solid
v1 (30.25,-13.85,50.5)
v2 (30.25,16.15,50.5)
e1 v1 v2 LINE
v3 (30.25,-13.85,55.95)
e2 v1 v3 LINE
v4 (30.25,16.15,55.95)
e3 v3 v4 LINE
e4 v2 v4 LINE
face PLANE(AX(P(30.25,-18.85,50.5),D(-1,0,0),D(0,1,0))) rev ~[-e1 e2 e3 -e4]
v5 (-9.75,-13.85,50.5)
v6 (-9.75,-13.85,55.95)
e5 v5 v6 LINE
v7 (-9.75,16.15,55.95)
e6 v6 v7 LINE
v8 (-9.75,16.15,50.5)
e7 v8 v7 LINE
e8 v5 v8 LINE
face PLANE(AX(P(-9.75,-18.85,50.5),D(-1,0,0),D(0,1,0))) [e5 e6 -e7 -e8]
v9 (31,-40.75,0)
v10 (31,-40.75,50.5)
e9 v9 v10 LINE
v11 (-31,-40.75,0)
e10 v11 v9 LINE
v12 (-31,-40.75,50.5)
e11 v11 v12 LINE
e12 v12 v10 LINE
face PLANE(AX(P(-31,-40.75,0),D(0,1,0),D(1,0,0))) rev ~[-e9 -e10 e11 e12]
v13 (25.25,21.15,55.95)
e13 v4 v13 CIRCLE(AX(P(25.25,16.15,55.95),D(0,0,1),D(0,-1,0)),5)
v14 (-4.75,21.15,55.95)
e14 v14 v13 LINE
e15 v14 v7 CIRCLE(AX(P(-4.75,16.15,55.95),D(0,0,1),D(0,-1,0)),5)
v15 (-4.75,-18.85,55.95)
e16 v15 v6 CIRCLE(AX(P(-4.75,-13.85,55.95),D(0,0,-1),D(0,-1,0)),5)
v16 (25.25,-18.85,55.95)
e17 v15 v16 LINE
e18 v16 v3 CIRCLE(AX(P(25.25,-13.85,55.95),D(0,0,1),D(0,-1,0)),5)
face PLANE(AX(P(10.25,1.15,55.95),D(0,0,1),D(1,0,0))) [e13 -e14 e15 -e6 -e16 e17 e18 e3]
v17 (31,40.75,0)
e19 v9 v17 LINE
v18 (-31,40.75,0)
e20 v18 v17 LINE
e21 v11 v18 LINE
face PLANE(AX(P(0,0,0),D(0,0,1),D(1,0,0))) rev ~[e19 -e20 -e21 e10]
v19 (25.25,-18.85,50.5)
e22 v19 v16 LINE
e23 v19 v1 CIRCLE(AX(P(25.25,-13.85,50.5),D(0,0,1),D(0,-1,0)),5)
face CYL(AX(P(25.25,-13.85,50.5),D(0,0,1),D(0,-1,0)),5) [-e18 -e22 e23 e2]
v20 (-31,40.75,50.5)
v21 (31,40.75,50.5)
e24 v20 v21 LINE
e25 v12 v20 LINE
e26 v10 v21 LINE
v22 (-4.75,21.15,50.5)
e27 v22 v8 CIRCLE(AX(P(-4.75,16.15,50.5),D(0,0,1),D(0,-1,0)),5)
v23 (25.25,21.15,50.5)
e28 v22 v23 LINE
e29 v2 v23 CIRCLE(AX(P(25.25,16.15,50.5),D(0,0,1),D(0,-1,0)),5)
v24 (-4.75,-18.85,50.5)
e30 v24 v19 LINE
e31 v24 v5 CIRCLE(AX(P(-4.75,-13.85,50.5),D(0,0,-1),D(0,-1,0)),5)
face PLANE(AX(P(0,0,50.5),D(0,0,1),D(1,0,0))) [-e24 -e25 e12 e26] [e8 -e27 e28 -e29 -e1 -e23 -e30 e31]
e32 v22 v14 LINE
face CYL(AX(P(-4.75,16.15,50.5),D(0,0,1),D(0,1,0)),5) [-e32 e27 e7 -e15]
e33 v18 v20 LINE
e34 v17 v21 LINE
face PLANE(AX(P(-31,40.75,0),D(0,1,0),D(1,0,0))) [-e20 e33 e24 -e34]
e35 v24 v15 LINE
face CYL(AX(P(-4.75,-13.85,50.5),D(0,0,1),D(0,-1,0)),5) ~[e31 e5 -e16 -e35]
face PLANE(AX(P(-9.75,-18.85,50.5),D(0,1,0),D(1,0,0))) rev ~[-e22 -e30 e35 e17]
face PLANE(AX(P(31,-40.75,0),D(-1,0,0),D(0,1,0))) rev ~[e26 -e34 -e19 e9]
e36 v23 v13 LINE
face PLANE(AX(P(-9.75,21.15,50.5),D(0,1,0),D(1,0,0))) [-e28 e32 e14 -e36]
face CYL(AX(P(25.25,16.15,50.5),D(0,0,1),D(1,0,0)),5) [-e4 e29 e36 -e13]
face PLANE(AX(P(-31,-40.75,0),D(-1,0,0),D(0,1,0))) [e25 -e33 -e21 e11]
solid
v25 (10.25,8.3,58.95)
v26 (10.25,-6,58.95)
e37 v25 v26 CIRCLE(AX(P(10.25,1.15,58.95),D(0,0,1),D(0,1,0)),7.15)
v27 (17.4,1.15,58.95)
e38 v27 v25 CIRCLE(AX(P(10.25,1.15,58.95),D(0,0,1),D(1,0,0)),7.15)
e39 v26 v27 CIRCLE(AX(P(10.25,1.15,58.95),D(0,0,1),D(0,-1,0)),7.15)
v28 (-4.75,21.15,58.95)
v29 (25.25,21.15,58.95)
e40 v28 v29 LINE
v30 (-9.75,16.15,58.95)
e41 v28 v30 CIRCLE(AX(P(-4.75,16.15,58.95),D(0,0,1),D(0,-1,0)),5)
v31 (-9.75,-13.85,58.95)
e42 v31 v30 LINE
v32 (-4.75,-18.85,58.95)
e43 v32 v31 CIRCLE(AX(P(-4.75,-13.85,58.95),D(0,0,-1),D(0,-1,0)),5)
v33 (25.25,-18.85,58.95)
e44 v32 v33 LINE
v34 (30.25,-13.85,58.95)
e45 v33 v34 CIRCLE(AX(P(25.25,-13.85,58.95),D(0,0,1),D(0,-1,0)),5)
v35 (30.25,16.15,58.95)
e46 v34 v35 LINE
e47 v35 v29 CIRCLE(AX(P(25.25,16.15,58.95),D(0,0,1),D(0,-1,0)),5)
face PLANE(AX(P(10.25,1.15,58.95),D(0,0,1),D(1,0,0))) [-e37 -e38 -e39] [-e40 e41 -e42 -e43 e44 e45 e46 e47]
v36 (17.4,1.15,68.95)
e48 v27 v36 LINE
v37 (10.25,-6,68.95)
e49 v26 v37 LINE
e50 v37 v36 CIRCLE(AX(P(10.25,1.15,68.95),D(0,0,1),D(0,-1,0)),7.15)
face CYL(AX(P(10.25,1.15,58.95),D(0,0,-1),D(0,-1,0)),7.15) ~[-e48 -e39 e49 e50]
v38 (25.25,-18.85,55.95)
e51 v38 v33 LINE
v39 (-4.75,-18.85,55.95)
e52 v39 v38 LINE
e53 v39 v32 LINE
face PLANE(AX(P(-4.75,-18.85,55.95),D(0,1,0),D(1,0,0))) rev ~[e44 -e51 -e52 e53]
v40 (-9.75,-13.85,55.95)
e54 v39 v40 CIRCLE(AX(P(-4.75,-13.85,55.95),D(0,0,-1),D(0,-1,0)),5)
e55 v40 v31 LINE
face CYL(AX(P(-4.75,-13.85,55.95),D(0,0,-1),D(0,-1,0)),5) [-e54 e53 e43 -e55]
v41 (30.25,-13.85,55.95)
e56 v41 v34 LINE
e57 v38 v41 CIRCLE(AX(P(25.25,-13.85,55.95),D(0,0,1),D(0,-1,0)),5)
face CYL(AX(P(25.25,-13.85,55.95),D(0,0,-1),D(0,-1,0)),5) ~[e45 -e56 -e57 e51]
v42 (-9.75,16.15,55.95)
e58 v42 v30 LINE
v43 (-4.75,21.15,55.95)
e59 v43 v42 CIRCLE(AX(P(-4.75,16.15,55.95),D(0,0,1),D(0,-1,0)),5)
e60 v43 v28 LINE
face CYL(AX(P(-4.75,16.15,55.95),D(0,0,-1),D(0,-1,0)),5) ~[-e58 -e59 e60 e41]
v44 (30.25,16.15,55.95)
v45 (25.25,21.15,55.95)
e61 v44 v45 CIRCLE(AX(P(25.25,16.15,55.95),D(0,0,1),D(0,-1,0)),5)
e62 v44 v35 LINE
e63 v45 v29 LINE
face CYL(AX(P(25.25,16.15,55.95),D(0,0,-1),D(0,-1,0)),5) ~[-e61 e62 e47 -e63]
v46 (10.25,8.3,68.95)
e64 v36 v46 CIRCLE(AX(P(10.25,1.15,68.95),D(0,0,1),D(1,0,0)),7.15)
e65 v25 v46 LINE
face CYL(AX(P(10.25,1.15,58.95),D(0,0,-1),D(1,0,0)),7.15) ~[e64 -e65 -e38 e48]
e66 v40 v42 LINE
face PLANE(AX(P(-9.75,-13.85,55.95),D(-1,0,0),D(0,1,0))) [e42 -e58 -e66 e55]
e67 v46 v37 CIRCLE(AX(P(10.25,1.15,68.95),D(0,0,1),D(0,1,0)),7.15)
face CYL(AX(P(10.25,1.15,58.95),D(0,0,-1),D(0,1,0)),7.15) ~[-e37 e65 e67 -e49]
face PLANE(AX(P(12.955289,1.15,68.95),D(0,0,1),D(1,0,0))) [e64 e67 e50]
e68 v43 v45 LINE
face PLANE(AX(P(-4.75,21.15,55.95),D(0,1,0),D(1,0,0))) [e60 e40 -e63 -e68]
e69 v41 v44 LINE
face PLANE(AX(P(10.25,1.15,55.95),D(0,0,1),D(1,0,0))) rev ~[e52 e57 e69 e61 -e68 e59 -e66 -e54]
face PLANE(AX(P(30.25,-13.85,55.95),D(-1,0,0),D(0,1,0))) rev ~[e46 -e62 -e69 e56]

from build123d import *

# Parameters (mm, degrees)
F0_W     = 62
F0_H     = 81.5
F1_DEPTH = 50.5
F2_W     = 40
F2_H     = 40
F3_DEPTH = 5.45
F4_R     = 5
F5_DEPTH = 3
F7_DEPTH = 10


# Not quite as in the source:
# - a feature of the source that left no trace in its solid (it failed there, or was rolled back) is left out


with BuildPart() as f1:
    # F0 (on Top) → F1 (new body)
    with BuildSketch(Plane.XY):
        Rectangle(F0_W, F0_H)
    extrude(amount=F1_DEPTH)

    # F2 (on face) → F3 (join)
    with BuildSketch(Plane.XY.offset(50.5)):
        with Locations((10.25, 1.15)):
            Rectangle(F2_W, F2_H)
    extrude(amount=F3_DEPTH)

    # F4
    f4_edges = [f1.edges().sort_by_distance(p)[0] for p in [
        (-9.75, 21.15, 53.225),
        (-9.75, -18.85, 53.225),
        (30.25, -18.85, 53.225),
        (30.25, 21.15, 53.225),
    ]]
    fillet(f4_edges, radius=F4_R)


with BuildPart() as f5:
    # F5 (new): a face of the model
    f5_faces = [f1.part.faces().sort_by_distance(p)[0] for p in [
        (10.25, 1.15, 55.95),
    ]]
    extrude(f5_faces, amount=F5_DEPTH)

    # F6 (on face) → F7 (join)
    with BuildSketch(Plane.XY.offset(58.95)):
        with BuildLine():
            ThreePointArc((17.4, 1.15), (15.3058134855, 6.2058134855), (10.25, 8.3))
            Line((10.25, 8.3), (10.25, -6))
            ThreePointArc((10.25, -6), (15.3058134855, -3.9058134855), (17.4, 1.15))
        make_face()
        with BuildLine():
            Line((10.25, -6), (10.25, 8.3))
            ThreePointArc((10.25, 8.3), (3.1, 1.15), (10.25, -6))
        make_face()
    extrude(amount=F7_DEPTH)


solid = Compound([f1.part, f5.part])
